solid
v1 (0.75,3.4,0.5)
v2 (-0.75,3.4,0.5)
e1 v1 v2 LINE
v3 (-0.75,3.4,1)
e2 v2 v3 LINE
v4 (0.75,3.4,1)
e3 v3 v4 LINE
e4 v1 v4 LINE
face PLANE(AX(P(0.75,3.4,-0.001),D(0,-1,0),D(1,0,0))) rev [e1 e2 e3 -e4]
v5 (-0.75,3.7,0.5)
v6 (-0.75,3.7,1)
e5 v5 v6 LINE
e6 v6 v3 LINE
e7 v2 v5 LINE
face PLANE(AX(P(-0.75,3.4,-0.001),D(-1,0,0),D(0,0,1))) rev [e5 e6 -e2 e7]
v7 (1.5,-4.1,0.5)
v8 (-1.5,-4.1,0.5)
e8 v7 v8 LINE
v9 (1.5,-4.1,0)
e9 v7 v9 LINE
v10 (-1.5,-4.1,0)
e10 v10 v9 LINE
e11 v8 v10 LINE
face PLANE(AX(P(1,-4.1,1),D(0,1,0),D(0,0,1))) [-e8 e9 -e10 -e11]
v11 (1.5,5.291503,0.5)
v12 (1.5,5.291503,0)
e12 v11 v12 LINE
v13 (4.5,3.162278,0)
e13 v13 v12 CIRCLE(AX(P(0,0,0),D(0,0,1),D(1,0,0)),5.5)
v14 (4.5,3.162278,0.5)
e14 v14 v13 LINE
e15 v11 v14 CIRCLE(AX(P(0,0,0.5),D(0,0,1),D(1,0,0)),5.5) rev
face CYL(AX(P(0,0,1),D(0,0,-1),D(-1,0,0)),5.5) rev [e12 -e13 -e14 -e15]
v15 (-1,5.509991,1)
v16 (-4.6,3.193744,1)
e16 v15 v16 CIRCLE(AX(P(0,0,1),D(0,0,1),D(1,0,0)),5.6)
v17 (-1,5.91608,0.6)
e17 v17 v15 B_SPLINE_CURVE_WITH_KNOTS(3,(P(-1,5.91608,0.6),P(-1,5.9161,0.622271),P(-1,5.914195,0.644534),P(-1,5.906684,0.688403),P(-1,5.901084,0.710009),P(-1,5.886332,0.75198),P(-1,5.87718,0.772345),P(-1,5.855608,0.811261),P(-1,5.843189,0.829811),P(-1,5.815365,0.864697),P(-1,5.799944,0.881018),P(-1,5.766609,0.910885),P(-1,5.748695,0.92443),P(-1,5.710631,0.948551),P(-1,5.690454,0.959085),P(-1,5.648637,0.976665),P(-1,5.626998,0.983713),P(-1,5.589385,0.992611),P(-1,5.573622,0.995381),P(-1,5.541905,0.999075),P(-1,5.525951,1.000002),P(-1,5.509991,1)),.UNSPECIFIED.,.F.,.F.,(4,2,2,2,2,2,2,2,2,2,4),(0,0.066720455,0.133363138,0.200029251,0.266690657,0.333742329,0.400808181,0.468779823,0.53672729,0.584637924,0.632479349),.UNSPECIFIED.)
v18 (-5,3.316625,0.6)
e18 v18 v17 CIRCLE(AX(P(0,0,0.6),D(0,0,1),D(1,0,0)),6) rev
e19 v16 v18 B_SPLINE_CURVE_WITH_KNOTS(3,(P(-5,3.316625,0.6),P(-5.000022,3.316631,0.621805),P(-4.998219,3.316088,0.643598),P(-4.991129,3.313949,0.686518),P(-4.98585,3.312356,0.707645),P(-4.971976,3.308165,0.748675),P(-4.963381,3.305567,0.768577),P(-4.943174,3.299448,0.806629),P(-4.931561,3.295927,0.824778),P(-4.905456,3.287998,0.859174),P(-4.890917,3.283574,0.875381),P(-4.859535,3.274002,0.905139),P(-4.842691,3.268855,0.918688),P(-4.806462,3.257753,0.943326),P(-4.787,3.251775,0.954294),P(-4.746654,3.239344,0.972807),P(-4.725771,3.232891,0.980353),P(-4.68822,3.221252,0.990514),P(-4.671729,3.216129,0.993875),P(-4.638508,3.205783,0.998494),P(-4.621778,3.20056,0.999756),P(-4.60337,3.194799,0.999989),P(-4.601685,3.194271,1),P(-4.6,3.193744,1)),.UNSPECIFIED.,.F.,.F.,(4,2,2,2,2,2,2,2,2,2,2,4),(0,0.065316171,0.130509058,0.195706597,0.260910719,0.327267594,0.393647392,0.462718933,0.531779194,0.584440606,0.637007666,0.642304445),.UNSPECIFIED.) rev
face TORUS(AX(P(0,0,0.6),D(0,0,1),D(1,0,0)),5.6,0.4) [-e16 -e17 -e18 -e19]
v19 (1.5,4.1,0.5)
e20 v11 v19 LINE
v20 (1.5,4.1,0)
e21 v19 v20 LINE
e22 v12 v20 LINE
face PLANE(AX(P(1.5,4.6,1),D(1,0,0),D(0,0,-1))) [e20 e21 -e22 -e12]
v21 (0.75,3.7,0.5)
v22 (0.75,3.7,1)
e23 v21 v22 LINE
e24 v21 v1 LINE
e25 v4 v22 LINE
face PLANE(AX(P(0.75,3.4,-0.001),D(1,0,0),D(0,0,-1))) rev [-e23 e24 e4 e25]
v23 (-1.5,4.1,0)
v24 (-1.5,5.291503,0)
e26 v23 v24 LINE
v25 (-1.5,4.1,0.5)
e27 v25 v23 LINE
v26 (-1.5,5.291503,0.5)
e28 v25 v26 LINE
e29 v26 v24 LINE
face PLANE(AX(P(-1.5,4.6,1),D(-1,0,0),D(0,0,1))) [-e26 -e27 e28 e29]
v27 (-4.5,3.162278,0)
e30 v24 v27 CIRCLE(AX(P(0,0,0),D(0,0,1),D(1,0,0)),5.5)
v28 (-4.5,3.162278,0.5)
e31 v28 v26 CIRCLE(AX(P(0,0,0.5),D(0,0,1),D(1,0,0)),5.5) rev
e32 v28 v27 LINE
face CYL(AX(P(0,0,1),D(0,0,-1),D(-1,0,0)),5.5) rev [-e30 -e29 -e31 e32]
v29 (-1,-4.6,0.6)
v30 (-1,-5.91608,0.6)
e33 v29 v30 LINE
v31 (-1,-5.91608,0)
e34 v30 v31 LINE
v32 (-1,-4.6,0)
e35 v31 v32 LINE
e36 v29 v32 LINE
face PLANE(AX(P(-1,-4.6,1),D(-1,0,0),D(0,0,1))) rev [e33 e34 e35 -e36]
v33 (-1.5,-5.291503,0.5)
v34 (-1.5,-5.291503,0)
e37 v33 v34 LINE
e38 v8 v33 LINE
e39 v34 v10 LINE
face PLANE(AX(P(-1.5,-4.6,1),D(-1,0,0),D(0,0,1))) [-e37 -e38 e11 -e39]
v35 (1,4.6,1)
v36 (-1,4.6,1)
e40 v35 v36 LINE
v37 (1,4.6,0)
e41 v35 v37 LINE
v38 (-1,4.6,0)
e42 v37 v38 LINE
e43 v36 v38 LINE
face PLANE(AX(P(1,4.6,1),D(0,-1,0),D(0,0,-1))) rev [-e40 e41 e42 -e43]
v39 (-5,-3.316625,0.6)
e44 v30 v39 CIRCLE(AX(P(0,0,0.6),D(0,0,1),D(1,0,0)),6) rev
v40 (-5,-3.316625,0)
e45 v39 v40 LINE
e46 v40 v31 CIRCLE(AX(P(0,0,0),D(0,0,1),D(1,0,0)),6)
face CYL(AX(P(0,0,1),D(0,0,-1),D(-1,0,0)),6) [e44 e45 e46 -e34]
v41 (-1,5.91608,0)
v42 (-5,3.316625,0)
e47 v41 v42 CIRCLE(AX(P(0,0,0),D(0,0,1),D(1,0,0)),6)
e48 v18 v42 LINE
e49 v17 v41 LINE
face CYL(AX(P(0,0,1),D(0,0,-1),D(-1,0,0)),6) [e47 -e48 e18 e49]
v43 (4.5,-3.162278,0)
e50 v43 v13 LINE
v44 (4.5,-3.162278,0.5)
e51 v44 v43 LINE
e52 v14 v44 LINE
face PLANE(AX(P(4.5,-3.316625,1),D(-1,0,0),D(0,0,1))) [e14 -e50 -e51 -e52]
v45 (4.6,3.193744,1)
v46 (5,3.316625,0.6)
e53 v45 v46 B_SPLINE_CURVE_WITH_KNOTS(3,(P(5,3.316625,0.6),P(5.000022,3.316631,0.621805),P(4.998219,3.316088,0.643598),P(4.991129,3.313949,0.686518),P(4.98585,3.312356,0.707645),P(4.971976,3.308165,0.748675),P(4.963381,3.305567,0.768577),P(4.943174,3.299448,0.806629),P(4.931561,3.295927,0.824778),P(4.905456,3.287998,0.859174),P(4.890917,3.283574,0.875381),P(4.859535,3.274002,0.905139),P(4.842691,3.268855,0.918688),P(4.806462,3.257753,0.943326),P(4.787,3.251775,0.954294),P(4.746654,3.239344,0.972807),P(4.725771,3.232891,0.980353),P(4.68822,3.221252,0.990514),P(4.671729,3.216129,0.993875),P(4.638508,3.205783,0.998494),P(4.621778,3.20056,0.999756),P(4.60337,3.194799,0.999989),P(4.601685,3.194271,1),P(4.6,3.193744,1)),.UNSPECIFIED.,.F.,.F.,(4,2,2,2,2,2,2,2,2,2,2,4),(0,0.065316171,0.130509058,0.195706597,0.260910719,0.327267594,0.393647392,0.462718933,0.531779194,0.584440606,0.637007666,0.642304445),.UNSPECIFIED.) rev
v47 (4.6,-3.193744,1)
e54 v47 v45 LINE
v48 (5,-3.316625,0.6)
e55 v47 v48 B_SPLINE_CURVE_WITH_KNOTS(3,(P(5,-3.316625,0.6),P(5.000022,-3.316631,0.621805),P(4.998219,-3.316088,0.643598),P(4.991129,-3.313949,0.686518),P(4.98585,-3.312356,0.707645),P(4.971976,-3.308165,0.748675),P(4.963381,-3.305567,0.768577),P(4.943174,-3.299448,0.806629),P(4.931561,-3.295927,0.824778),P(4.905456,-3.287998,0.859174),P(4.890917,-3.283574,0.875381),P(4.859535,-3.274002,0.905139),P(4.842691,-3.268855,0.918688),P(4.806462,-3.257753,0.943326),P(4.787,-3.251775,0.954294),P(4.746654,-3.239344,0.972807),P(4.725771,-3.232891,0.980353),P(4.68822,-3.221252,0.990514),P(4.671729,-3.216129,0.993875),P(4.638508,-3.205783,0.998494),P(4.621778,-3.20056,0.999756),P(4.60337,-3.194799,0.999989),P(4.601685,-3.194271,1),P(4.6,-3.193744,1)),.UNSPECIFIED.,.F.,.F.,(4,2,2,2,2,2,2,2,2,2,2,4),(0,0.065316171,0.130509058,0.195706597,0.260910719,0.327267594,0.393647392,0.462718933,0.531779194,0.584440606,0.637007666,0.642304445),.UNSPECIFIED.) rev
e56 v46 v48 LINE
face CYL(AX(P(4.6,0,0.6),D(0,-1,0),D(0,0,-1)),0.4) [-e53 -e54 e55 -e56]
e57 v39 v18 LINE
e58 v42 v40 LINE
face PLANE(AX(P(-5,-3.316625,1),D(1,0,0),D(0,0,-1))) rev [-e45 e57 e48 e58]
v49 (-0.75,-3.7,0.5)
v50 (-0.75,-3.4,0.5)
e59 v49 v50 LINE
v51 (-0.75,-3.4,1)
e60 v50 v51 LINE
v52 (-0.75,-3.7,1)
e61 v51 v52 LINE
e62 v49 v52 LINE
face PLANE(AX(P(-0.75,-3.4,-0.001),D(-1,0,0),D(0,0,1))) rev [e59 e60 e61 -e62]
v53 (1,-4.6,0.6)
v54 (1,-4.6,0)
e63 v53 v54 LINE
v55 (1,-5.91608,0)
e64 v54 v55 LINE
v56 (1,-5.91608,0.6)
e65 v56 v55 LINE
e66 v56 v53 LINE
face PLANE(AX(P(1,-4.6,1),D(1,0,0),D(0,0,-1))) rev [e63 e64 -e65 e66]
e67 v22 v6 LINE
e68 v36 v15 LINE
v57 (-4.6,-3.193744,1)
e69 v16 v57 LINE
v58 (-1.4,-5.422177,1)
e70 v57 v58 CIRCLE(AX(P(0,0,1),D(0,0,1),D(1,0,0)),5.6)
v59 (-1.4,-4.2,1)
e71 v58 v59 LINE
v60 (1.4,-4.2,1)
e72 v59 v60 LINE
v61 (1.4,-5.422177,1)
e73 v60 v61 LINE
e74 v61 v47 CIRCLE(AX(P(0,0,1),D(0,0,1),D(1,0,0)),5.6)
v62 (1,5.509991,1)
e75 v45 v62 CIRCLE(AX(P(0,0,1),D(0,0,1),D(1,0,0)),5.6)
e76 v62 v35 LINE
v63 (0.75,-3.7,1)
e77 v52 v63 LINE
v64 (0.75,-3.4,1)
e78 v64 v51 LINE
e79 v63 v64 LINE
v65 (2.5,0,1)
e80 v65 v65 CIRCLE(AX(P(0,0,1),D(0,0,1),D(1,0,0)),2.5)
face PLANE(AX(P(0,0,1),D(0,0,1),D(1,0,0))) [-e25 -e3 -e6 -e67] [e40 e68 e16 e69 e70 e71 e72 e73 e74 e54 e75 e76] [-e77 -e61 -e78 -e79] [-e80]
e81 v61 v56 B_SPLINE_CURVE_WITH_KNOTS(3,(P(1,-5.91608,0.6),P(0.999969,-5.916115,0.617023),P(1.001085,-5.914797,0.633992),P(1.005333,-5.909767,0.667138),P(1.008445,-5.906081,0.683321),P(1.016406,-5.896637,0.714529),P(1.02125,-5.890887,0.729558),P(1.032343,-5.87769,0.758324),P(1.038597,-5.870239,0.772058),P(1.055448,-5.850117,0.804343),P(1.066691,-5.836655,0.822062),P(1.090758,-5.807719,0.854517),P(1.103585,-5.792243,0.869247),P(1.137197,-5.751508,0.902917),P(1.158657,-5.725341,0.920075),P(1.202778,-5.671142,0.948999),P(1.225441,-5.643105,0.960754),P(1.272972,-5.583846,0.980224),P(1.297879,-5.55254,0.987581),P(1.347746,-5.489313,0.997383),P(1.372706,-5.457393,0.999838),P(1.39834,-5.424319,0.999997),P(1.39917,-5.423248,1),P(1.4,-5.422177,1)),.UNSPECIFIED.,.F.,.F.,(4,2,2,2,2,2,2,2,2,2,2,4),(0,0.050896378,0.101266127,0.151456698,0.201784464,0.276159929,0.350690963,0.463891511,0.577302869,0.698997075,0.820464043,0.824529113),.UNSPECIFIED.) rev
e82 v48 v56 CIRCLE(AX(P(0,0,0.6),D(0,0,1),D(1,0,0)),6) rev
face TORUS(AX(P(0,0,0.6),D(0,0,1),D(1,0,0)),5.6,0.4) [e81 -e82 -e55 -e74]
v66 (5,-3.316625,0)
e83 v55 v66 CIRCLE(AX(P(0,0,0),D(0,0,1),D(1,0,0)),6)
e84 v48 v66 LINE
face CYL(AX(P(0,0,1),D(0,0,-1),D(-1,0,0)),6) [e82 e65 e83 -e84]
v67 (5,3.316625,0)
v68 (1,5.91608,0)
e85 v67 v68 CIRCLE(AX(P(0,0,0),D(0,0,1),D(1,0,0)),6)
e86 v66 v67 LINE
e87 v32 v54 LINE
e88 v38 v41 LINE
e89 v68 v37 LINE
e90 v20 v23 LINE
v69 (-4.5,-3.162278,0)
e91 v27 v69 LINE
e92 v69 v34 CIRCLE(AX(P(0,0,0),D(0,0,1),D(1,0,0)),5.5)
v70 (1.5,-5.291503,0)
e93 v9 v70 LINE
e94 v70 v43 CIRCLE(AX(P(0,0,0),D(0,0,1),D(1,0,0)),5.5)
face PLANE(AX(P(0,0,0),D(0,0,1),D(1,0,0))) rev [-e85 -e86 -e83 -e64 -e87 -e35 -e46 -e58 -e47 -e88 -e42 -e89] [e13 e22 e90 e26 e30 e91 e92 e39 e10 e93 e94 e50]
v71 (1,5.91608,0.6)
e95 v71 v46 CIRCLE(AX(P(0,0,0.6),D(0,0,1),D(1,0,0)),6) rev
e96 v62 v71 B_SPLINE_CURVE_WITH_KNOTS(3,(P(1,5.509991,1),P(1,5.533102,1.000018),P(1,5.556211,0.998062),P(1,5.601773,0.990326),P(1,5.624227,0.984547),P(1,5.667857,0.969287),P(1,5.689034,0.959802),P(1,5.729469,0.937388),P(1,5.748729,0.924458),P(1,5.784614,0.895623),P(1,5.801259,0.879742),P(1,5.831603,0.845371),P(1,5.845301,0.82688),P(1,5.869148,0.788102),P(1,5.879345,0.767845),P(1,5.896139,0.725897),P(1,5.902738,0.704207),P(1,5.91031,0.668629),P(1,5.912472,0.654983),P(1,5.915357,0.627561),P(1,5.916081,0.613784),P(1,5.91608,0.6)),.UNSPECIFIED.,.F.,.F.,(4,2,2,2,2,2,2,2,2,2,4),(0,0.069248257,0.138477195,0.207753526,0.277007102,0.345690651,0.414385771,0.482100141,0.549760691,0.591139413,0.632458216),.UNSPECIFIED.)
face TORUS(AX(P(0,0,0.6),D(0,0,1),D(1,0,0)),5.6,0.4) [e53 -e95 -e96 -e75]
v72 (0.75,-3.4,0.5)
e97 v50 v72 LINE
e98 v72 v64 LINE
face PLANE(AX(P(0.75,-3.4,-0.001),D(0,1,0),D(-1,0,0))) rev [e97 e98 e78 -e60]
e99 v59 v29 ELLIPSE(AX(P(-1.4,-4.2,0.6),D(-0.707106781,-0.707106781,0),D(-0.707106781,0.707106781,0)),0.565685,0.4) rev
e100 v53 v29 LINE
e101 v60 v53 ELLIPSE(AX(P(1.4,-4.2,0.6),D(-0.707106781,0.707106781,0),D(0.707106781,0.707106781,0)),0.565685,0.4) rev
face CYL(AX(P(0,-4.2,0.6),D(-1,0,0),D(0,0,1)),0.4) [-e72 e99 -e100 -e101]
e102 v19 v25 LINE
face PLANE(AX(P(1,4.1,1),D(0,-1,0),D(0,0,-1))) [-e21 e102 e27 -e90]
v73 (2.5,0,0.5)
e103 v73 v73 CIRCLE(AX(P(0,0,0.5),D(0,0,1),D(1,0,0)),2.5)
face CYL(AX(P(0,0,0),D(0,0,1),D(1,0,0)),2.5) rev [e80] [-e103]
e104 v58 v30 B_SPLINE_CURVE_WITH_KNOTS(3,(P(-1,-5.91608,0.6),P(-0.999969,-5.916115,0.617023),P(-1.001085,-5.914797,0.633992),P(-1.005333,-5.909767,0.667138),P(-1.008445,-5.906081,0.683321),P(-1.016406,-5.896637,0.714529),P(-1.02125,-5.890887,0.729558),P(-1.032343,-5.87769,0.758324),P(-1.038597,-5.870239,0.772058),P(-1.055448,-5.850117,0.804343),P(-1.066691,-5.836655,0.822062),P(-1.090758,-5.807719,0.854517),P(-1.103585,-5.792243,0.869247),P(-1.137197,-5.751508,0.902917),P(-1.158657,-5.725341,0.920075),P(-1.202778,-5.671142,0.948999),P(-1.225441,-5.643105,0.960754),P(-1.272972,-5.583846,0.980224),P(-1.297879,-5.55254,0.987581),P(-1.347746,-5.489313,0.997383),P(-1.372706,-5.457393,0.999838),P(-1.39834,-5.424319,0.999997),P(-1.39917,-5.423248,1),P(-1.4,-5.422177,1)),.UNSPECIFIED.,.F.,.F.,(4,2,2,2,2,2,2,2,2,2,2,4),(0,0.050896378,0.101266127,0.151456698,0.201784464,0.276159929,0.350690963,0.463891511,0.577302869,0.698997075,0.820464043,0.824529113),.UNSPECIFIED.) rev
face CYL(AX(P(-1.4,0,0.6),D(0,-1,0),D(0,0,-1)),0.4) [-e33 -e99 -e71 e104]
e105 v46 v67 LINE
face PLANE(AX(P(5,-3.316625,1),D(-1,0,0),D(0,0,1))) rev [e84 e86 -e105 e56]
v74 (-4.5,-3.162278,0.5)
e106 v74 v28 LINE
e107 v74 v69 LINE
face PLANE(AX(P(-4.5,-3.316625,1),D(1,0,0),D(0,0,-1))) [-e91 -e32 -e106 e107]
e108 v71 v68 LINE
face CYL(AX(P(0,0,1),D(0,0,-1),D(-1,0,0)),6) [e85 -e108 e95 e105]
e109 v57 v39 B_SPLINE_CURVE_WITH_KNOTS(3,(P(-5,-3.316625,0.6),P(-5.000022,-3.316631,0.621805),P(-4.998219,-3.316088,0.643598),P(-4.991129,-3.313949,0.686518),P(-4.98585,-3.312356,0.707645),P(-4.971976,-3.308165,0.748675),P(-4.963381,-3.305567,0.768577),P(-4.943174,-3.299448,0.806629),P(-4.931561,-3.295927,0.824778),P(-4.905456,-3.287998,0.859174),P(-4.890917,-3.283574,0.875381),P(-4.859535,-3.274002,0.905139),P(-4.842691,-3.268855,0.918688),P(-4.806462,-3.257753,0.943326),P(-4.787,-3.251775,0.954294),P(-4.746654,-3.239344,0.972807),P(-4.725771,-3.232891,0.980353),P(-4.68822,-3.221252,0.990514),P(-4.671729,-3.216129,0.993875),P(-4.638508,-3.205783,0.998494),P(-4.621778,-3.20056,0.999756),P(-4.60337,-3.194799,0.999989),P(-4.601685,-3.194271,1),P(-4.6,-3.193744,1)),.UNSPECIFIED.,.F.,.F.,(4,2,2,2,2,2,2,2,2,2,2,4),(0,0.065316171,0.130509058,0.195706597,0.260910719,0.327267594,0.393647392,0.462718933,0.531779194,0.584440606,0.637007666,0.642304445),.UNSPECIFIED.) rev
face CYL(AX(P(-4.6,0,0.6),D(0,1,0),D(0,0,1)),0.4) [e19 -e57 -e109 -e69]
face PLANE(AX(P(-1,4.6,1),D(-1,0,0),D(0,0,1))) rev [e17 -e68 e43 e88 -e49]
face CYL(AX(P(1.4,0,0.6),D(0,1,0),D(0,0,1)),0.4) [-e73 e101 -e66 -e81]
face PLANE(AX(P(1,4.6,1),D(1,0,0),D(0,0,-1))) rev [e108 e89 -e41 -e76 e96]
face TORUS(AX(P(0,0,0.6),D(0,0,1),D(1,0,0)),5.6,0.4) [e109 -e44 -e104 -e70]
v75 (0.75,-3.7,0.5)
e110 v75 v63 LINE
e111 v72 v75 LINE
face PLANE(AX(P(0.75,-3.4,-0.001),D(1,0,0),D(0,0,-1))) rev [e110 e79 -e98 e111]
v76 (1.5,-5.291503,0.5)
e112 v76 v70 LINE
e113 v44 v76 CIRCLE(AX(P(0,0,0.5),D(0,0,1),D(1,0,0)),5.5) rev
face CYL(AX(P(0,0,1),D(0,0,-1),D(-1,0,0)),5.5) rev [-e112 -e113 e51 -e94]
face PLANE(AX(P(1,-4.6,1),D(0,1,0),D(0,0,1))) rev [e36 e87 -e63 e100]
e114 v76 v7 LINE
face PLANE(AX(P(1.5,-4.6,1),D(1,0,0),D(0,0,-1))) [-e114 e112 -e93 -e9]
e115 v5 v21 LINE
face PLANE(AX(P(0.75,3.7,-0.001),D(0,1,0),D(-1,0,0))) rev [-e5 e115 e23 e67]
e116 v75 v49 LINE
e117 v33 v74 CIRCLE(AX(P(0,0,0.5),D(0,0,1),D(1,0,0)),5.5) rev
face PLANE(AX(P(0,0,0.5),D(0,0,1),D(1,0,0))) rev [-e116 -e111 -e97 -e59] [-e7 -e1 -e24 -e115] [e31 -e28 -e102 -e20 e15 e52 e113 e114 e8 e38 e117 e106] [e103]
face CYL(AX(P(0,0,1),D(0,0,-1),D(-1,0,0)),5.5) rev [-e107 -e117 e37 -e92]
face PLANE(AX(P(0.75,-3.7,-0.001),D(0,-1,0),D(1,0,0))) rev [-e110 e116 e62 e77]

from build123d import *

# Parameters (mm, degrees)
BOSS_EXTRUDE1_DEPTH = 1
FILLET1_R           = 0.4
SHELL1_DEPTH        = 0.5
SKETCH3_R           = 2.5
CUT_EXTRUDE1_DEPTH  = 1
CUT_EXTRUDE2_REACH  = 9.81
SKETCH4_W           = 1.5
SKETCH4_H           = 0.3


# Read off the part's stored shape, not the designer's step: Shell1
with BuildPart() as part:
    # Sketch2 → Boss-Extrude1 (new body)
    with BuildSketch(Plane.XY):
        with BuildLine():
            Line((-5, -3.31662479), (-5, 3.31662479))
            ThreePointArc((-5, 3.31662479), (-3.269448205, 5.030974899), (-1, 5.916079783))
            Line((-1, 5.916079783), (-1, 4.6))
            Line((-1, 4.6), (1, 4.6))
            Line((1, 4.6), (1, 5.916079783))
            ThreePointArc((1, 5.916079783), (3.269448205, 5.030974899), (5, 3.31662479))
            Line((5, 3.31662479), (5, -3.31662479))
            ThreePointArc((5, -3.31662479), (3.269448205, -5.030974899), (1, -5.916079783))
            Line((1, -5.916079783), (1, -4.6))
            Line((1, -4.6), (-1, -4.6))
            Line((-1, -4.6), (-1, -5.916079783))
            ThreePointArc((-1, -5.916079783), (-3.269448205, -5.030974899), (-5, -3.31662479))
        make_face()
    extrude(amount=BOSS_EXTRUDE1_DEPTH)

    # Fillet1
    fillet1_edges = [part.edges().sort_by_distance(p)[0] for p in [
        (3.269448205, 5.030974899, 1),
        (5, 0, 1),
        (3.269448205, -5.030974899, 1),
        (1, -5.258039892, 1),
        (0, -4.6, 1),
        (-1, -5.258039892, 1),
        (-3.269448205, -5.030974899, 1),
        (-5, 0, 1),
        (-3.269448205, 5.030974899, 1),
    ]]
    fillet(fillet1_edges, radius=FILLET1_R)

    # Shell1 outline → Shell1 (cut)
    with BuildSketch(Plane.XY):
        with BuildLine():
            ThreePointArc((1.5, -5.291502622), (3.183300133, -4.485153316), (4.5, -3.16227766))
            Line((4.5, -3.16227766), (4.5, 3.16227766))
            ThreePointArc((4.5, 3.16227766), (3.183300133, 4.485153316), (1.5, 5.291502622))
            Line((1.5, 5.291502622), (1.5, 4.1))
            Line((1.5, 4.1), (-1.5, 4.1))
            Line((-1.5, 4.1), (-1.5, 5.291502622))
            ThreePointArc((-1.5, 5.291502622), (-3.183300133, 4.485153316), (-4.5, 3.16227766))
            Line((-4.5, 3.16227766), (-4.5, -3.16227766))
            ThreePointArc((-4.5, -3.16227766), (-3.183300133, -4.485153316), (-1.5, -5.291502622))
            Line((-1.5, -5.291502622), (-1.5, -4.1))
            Line((-1.5, -4.1), (1.5, -4.1))
            Line((1.5, -4.1), (1.5, -5.291502622))
        make_face()
    extrude(amount=SHELL1_DEPTH, mode=Mode.SUBTRACT)

    # Sketch3 → Cut-Extrude1 (cut)
    with BuildSketch(Plane.XY.offset(1)):
        Circle(SKETCH3_R)
    extrude(amount=-CUT_EXTRUDE1_DEPTH, mode=Mode.SUBTRACT)

    # Sketch4 → Cut-Extrude2 (cut, up to next)
    with BuildSketch(Plane.XY.offset(1), mode=Mode.PRIVATE) as cut_extrude2_sk1:
        with Locations((0, 3.55)):
            Rectangle(SKETCH4_W, SKETCH4_H)
    cut_extrude2_tool1 = extrude(cut_extrude2_sk1.sketch, amount=-CUT_EXTRUDE2_REACH, mode=Mode.PRIVATE) & part.part
    # Sketch4 → Cut-Extrude2 (cut, up to next)
    with BuildSketch(Plane.XY.offset(1), mode=Mode.PRIVATE) as cut_extrude2_sk2:
        with Locations((0, -3.55)):
            Rectangle(SKETCH4_W, SKETCH4_H)
    cut_extrude2_tool2 = extrude(cut_extrude2_sk2.sketch, amount=-CUT_EXTRUDE2_REACH, mode=Mode.PRIVATE) & part.part
    add(cut_extrude2_tool1.solids().sort_by_distance((0, 3.55, 1))[0], mode=Mode.SUBTRACT)
    add(cut_extrude2_tool2.solids().sort_by_distance((0, -3.55, 1))[0], mode=Mode.SUBTRACT)


solid = part.part
